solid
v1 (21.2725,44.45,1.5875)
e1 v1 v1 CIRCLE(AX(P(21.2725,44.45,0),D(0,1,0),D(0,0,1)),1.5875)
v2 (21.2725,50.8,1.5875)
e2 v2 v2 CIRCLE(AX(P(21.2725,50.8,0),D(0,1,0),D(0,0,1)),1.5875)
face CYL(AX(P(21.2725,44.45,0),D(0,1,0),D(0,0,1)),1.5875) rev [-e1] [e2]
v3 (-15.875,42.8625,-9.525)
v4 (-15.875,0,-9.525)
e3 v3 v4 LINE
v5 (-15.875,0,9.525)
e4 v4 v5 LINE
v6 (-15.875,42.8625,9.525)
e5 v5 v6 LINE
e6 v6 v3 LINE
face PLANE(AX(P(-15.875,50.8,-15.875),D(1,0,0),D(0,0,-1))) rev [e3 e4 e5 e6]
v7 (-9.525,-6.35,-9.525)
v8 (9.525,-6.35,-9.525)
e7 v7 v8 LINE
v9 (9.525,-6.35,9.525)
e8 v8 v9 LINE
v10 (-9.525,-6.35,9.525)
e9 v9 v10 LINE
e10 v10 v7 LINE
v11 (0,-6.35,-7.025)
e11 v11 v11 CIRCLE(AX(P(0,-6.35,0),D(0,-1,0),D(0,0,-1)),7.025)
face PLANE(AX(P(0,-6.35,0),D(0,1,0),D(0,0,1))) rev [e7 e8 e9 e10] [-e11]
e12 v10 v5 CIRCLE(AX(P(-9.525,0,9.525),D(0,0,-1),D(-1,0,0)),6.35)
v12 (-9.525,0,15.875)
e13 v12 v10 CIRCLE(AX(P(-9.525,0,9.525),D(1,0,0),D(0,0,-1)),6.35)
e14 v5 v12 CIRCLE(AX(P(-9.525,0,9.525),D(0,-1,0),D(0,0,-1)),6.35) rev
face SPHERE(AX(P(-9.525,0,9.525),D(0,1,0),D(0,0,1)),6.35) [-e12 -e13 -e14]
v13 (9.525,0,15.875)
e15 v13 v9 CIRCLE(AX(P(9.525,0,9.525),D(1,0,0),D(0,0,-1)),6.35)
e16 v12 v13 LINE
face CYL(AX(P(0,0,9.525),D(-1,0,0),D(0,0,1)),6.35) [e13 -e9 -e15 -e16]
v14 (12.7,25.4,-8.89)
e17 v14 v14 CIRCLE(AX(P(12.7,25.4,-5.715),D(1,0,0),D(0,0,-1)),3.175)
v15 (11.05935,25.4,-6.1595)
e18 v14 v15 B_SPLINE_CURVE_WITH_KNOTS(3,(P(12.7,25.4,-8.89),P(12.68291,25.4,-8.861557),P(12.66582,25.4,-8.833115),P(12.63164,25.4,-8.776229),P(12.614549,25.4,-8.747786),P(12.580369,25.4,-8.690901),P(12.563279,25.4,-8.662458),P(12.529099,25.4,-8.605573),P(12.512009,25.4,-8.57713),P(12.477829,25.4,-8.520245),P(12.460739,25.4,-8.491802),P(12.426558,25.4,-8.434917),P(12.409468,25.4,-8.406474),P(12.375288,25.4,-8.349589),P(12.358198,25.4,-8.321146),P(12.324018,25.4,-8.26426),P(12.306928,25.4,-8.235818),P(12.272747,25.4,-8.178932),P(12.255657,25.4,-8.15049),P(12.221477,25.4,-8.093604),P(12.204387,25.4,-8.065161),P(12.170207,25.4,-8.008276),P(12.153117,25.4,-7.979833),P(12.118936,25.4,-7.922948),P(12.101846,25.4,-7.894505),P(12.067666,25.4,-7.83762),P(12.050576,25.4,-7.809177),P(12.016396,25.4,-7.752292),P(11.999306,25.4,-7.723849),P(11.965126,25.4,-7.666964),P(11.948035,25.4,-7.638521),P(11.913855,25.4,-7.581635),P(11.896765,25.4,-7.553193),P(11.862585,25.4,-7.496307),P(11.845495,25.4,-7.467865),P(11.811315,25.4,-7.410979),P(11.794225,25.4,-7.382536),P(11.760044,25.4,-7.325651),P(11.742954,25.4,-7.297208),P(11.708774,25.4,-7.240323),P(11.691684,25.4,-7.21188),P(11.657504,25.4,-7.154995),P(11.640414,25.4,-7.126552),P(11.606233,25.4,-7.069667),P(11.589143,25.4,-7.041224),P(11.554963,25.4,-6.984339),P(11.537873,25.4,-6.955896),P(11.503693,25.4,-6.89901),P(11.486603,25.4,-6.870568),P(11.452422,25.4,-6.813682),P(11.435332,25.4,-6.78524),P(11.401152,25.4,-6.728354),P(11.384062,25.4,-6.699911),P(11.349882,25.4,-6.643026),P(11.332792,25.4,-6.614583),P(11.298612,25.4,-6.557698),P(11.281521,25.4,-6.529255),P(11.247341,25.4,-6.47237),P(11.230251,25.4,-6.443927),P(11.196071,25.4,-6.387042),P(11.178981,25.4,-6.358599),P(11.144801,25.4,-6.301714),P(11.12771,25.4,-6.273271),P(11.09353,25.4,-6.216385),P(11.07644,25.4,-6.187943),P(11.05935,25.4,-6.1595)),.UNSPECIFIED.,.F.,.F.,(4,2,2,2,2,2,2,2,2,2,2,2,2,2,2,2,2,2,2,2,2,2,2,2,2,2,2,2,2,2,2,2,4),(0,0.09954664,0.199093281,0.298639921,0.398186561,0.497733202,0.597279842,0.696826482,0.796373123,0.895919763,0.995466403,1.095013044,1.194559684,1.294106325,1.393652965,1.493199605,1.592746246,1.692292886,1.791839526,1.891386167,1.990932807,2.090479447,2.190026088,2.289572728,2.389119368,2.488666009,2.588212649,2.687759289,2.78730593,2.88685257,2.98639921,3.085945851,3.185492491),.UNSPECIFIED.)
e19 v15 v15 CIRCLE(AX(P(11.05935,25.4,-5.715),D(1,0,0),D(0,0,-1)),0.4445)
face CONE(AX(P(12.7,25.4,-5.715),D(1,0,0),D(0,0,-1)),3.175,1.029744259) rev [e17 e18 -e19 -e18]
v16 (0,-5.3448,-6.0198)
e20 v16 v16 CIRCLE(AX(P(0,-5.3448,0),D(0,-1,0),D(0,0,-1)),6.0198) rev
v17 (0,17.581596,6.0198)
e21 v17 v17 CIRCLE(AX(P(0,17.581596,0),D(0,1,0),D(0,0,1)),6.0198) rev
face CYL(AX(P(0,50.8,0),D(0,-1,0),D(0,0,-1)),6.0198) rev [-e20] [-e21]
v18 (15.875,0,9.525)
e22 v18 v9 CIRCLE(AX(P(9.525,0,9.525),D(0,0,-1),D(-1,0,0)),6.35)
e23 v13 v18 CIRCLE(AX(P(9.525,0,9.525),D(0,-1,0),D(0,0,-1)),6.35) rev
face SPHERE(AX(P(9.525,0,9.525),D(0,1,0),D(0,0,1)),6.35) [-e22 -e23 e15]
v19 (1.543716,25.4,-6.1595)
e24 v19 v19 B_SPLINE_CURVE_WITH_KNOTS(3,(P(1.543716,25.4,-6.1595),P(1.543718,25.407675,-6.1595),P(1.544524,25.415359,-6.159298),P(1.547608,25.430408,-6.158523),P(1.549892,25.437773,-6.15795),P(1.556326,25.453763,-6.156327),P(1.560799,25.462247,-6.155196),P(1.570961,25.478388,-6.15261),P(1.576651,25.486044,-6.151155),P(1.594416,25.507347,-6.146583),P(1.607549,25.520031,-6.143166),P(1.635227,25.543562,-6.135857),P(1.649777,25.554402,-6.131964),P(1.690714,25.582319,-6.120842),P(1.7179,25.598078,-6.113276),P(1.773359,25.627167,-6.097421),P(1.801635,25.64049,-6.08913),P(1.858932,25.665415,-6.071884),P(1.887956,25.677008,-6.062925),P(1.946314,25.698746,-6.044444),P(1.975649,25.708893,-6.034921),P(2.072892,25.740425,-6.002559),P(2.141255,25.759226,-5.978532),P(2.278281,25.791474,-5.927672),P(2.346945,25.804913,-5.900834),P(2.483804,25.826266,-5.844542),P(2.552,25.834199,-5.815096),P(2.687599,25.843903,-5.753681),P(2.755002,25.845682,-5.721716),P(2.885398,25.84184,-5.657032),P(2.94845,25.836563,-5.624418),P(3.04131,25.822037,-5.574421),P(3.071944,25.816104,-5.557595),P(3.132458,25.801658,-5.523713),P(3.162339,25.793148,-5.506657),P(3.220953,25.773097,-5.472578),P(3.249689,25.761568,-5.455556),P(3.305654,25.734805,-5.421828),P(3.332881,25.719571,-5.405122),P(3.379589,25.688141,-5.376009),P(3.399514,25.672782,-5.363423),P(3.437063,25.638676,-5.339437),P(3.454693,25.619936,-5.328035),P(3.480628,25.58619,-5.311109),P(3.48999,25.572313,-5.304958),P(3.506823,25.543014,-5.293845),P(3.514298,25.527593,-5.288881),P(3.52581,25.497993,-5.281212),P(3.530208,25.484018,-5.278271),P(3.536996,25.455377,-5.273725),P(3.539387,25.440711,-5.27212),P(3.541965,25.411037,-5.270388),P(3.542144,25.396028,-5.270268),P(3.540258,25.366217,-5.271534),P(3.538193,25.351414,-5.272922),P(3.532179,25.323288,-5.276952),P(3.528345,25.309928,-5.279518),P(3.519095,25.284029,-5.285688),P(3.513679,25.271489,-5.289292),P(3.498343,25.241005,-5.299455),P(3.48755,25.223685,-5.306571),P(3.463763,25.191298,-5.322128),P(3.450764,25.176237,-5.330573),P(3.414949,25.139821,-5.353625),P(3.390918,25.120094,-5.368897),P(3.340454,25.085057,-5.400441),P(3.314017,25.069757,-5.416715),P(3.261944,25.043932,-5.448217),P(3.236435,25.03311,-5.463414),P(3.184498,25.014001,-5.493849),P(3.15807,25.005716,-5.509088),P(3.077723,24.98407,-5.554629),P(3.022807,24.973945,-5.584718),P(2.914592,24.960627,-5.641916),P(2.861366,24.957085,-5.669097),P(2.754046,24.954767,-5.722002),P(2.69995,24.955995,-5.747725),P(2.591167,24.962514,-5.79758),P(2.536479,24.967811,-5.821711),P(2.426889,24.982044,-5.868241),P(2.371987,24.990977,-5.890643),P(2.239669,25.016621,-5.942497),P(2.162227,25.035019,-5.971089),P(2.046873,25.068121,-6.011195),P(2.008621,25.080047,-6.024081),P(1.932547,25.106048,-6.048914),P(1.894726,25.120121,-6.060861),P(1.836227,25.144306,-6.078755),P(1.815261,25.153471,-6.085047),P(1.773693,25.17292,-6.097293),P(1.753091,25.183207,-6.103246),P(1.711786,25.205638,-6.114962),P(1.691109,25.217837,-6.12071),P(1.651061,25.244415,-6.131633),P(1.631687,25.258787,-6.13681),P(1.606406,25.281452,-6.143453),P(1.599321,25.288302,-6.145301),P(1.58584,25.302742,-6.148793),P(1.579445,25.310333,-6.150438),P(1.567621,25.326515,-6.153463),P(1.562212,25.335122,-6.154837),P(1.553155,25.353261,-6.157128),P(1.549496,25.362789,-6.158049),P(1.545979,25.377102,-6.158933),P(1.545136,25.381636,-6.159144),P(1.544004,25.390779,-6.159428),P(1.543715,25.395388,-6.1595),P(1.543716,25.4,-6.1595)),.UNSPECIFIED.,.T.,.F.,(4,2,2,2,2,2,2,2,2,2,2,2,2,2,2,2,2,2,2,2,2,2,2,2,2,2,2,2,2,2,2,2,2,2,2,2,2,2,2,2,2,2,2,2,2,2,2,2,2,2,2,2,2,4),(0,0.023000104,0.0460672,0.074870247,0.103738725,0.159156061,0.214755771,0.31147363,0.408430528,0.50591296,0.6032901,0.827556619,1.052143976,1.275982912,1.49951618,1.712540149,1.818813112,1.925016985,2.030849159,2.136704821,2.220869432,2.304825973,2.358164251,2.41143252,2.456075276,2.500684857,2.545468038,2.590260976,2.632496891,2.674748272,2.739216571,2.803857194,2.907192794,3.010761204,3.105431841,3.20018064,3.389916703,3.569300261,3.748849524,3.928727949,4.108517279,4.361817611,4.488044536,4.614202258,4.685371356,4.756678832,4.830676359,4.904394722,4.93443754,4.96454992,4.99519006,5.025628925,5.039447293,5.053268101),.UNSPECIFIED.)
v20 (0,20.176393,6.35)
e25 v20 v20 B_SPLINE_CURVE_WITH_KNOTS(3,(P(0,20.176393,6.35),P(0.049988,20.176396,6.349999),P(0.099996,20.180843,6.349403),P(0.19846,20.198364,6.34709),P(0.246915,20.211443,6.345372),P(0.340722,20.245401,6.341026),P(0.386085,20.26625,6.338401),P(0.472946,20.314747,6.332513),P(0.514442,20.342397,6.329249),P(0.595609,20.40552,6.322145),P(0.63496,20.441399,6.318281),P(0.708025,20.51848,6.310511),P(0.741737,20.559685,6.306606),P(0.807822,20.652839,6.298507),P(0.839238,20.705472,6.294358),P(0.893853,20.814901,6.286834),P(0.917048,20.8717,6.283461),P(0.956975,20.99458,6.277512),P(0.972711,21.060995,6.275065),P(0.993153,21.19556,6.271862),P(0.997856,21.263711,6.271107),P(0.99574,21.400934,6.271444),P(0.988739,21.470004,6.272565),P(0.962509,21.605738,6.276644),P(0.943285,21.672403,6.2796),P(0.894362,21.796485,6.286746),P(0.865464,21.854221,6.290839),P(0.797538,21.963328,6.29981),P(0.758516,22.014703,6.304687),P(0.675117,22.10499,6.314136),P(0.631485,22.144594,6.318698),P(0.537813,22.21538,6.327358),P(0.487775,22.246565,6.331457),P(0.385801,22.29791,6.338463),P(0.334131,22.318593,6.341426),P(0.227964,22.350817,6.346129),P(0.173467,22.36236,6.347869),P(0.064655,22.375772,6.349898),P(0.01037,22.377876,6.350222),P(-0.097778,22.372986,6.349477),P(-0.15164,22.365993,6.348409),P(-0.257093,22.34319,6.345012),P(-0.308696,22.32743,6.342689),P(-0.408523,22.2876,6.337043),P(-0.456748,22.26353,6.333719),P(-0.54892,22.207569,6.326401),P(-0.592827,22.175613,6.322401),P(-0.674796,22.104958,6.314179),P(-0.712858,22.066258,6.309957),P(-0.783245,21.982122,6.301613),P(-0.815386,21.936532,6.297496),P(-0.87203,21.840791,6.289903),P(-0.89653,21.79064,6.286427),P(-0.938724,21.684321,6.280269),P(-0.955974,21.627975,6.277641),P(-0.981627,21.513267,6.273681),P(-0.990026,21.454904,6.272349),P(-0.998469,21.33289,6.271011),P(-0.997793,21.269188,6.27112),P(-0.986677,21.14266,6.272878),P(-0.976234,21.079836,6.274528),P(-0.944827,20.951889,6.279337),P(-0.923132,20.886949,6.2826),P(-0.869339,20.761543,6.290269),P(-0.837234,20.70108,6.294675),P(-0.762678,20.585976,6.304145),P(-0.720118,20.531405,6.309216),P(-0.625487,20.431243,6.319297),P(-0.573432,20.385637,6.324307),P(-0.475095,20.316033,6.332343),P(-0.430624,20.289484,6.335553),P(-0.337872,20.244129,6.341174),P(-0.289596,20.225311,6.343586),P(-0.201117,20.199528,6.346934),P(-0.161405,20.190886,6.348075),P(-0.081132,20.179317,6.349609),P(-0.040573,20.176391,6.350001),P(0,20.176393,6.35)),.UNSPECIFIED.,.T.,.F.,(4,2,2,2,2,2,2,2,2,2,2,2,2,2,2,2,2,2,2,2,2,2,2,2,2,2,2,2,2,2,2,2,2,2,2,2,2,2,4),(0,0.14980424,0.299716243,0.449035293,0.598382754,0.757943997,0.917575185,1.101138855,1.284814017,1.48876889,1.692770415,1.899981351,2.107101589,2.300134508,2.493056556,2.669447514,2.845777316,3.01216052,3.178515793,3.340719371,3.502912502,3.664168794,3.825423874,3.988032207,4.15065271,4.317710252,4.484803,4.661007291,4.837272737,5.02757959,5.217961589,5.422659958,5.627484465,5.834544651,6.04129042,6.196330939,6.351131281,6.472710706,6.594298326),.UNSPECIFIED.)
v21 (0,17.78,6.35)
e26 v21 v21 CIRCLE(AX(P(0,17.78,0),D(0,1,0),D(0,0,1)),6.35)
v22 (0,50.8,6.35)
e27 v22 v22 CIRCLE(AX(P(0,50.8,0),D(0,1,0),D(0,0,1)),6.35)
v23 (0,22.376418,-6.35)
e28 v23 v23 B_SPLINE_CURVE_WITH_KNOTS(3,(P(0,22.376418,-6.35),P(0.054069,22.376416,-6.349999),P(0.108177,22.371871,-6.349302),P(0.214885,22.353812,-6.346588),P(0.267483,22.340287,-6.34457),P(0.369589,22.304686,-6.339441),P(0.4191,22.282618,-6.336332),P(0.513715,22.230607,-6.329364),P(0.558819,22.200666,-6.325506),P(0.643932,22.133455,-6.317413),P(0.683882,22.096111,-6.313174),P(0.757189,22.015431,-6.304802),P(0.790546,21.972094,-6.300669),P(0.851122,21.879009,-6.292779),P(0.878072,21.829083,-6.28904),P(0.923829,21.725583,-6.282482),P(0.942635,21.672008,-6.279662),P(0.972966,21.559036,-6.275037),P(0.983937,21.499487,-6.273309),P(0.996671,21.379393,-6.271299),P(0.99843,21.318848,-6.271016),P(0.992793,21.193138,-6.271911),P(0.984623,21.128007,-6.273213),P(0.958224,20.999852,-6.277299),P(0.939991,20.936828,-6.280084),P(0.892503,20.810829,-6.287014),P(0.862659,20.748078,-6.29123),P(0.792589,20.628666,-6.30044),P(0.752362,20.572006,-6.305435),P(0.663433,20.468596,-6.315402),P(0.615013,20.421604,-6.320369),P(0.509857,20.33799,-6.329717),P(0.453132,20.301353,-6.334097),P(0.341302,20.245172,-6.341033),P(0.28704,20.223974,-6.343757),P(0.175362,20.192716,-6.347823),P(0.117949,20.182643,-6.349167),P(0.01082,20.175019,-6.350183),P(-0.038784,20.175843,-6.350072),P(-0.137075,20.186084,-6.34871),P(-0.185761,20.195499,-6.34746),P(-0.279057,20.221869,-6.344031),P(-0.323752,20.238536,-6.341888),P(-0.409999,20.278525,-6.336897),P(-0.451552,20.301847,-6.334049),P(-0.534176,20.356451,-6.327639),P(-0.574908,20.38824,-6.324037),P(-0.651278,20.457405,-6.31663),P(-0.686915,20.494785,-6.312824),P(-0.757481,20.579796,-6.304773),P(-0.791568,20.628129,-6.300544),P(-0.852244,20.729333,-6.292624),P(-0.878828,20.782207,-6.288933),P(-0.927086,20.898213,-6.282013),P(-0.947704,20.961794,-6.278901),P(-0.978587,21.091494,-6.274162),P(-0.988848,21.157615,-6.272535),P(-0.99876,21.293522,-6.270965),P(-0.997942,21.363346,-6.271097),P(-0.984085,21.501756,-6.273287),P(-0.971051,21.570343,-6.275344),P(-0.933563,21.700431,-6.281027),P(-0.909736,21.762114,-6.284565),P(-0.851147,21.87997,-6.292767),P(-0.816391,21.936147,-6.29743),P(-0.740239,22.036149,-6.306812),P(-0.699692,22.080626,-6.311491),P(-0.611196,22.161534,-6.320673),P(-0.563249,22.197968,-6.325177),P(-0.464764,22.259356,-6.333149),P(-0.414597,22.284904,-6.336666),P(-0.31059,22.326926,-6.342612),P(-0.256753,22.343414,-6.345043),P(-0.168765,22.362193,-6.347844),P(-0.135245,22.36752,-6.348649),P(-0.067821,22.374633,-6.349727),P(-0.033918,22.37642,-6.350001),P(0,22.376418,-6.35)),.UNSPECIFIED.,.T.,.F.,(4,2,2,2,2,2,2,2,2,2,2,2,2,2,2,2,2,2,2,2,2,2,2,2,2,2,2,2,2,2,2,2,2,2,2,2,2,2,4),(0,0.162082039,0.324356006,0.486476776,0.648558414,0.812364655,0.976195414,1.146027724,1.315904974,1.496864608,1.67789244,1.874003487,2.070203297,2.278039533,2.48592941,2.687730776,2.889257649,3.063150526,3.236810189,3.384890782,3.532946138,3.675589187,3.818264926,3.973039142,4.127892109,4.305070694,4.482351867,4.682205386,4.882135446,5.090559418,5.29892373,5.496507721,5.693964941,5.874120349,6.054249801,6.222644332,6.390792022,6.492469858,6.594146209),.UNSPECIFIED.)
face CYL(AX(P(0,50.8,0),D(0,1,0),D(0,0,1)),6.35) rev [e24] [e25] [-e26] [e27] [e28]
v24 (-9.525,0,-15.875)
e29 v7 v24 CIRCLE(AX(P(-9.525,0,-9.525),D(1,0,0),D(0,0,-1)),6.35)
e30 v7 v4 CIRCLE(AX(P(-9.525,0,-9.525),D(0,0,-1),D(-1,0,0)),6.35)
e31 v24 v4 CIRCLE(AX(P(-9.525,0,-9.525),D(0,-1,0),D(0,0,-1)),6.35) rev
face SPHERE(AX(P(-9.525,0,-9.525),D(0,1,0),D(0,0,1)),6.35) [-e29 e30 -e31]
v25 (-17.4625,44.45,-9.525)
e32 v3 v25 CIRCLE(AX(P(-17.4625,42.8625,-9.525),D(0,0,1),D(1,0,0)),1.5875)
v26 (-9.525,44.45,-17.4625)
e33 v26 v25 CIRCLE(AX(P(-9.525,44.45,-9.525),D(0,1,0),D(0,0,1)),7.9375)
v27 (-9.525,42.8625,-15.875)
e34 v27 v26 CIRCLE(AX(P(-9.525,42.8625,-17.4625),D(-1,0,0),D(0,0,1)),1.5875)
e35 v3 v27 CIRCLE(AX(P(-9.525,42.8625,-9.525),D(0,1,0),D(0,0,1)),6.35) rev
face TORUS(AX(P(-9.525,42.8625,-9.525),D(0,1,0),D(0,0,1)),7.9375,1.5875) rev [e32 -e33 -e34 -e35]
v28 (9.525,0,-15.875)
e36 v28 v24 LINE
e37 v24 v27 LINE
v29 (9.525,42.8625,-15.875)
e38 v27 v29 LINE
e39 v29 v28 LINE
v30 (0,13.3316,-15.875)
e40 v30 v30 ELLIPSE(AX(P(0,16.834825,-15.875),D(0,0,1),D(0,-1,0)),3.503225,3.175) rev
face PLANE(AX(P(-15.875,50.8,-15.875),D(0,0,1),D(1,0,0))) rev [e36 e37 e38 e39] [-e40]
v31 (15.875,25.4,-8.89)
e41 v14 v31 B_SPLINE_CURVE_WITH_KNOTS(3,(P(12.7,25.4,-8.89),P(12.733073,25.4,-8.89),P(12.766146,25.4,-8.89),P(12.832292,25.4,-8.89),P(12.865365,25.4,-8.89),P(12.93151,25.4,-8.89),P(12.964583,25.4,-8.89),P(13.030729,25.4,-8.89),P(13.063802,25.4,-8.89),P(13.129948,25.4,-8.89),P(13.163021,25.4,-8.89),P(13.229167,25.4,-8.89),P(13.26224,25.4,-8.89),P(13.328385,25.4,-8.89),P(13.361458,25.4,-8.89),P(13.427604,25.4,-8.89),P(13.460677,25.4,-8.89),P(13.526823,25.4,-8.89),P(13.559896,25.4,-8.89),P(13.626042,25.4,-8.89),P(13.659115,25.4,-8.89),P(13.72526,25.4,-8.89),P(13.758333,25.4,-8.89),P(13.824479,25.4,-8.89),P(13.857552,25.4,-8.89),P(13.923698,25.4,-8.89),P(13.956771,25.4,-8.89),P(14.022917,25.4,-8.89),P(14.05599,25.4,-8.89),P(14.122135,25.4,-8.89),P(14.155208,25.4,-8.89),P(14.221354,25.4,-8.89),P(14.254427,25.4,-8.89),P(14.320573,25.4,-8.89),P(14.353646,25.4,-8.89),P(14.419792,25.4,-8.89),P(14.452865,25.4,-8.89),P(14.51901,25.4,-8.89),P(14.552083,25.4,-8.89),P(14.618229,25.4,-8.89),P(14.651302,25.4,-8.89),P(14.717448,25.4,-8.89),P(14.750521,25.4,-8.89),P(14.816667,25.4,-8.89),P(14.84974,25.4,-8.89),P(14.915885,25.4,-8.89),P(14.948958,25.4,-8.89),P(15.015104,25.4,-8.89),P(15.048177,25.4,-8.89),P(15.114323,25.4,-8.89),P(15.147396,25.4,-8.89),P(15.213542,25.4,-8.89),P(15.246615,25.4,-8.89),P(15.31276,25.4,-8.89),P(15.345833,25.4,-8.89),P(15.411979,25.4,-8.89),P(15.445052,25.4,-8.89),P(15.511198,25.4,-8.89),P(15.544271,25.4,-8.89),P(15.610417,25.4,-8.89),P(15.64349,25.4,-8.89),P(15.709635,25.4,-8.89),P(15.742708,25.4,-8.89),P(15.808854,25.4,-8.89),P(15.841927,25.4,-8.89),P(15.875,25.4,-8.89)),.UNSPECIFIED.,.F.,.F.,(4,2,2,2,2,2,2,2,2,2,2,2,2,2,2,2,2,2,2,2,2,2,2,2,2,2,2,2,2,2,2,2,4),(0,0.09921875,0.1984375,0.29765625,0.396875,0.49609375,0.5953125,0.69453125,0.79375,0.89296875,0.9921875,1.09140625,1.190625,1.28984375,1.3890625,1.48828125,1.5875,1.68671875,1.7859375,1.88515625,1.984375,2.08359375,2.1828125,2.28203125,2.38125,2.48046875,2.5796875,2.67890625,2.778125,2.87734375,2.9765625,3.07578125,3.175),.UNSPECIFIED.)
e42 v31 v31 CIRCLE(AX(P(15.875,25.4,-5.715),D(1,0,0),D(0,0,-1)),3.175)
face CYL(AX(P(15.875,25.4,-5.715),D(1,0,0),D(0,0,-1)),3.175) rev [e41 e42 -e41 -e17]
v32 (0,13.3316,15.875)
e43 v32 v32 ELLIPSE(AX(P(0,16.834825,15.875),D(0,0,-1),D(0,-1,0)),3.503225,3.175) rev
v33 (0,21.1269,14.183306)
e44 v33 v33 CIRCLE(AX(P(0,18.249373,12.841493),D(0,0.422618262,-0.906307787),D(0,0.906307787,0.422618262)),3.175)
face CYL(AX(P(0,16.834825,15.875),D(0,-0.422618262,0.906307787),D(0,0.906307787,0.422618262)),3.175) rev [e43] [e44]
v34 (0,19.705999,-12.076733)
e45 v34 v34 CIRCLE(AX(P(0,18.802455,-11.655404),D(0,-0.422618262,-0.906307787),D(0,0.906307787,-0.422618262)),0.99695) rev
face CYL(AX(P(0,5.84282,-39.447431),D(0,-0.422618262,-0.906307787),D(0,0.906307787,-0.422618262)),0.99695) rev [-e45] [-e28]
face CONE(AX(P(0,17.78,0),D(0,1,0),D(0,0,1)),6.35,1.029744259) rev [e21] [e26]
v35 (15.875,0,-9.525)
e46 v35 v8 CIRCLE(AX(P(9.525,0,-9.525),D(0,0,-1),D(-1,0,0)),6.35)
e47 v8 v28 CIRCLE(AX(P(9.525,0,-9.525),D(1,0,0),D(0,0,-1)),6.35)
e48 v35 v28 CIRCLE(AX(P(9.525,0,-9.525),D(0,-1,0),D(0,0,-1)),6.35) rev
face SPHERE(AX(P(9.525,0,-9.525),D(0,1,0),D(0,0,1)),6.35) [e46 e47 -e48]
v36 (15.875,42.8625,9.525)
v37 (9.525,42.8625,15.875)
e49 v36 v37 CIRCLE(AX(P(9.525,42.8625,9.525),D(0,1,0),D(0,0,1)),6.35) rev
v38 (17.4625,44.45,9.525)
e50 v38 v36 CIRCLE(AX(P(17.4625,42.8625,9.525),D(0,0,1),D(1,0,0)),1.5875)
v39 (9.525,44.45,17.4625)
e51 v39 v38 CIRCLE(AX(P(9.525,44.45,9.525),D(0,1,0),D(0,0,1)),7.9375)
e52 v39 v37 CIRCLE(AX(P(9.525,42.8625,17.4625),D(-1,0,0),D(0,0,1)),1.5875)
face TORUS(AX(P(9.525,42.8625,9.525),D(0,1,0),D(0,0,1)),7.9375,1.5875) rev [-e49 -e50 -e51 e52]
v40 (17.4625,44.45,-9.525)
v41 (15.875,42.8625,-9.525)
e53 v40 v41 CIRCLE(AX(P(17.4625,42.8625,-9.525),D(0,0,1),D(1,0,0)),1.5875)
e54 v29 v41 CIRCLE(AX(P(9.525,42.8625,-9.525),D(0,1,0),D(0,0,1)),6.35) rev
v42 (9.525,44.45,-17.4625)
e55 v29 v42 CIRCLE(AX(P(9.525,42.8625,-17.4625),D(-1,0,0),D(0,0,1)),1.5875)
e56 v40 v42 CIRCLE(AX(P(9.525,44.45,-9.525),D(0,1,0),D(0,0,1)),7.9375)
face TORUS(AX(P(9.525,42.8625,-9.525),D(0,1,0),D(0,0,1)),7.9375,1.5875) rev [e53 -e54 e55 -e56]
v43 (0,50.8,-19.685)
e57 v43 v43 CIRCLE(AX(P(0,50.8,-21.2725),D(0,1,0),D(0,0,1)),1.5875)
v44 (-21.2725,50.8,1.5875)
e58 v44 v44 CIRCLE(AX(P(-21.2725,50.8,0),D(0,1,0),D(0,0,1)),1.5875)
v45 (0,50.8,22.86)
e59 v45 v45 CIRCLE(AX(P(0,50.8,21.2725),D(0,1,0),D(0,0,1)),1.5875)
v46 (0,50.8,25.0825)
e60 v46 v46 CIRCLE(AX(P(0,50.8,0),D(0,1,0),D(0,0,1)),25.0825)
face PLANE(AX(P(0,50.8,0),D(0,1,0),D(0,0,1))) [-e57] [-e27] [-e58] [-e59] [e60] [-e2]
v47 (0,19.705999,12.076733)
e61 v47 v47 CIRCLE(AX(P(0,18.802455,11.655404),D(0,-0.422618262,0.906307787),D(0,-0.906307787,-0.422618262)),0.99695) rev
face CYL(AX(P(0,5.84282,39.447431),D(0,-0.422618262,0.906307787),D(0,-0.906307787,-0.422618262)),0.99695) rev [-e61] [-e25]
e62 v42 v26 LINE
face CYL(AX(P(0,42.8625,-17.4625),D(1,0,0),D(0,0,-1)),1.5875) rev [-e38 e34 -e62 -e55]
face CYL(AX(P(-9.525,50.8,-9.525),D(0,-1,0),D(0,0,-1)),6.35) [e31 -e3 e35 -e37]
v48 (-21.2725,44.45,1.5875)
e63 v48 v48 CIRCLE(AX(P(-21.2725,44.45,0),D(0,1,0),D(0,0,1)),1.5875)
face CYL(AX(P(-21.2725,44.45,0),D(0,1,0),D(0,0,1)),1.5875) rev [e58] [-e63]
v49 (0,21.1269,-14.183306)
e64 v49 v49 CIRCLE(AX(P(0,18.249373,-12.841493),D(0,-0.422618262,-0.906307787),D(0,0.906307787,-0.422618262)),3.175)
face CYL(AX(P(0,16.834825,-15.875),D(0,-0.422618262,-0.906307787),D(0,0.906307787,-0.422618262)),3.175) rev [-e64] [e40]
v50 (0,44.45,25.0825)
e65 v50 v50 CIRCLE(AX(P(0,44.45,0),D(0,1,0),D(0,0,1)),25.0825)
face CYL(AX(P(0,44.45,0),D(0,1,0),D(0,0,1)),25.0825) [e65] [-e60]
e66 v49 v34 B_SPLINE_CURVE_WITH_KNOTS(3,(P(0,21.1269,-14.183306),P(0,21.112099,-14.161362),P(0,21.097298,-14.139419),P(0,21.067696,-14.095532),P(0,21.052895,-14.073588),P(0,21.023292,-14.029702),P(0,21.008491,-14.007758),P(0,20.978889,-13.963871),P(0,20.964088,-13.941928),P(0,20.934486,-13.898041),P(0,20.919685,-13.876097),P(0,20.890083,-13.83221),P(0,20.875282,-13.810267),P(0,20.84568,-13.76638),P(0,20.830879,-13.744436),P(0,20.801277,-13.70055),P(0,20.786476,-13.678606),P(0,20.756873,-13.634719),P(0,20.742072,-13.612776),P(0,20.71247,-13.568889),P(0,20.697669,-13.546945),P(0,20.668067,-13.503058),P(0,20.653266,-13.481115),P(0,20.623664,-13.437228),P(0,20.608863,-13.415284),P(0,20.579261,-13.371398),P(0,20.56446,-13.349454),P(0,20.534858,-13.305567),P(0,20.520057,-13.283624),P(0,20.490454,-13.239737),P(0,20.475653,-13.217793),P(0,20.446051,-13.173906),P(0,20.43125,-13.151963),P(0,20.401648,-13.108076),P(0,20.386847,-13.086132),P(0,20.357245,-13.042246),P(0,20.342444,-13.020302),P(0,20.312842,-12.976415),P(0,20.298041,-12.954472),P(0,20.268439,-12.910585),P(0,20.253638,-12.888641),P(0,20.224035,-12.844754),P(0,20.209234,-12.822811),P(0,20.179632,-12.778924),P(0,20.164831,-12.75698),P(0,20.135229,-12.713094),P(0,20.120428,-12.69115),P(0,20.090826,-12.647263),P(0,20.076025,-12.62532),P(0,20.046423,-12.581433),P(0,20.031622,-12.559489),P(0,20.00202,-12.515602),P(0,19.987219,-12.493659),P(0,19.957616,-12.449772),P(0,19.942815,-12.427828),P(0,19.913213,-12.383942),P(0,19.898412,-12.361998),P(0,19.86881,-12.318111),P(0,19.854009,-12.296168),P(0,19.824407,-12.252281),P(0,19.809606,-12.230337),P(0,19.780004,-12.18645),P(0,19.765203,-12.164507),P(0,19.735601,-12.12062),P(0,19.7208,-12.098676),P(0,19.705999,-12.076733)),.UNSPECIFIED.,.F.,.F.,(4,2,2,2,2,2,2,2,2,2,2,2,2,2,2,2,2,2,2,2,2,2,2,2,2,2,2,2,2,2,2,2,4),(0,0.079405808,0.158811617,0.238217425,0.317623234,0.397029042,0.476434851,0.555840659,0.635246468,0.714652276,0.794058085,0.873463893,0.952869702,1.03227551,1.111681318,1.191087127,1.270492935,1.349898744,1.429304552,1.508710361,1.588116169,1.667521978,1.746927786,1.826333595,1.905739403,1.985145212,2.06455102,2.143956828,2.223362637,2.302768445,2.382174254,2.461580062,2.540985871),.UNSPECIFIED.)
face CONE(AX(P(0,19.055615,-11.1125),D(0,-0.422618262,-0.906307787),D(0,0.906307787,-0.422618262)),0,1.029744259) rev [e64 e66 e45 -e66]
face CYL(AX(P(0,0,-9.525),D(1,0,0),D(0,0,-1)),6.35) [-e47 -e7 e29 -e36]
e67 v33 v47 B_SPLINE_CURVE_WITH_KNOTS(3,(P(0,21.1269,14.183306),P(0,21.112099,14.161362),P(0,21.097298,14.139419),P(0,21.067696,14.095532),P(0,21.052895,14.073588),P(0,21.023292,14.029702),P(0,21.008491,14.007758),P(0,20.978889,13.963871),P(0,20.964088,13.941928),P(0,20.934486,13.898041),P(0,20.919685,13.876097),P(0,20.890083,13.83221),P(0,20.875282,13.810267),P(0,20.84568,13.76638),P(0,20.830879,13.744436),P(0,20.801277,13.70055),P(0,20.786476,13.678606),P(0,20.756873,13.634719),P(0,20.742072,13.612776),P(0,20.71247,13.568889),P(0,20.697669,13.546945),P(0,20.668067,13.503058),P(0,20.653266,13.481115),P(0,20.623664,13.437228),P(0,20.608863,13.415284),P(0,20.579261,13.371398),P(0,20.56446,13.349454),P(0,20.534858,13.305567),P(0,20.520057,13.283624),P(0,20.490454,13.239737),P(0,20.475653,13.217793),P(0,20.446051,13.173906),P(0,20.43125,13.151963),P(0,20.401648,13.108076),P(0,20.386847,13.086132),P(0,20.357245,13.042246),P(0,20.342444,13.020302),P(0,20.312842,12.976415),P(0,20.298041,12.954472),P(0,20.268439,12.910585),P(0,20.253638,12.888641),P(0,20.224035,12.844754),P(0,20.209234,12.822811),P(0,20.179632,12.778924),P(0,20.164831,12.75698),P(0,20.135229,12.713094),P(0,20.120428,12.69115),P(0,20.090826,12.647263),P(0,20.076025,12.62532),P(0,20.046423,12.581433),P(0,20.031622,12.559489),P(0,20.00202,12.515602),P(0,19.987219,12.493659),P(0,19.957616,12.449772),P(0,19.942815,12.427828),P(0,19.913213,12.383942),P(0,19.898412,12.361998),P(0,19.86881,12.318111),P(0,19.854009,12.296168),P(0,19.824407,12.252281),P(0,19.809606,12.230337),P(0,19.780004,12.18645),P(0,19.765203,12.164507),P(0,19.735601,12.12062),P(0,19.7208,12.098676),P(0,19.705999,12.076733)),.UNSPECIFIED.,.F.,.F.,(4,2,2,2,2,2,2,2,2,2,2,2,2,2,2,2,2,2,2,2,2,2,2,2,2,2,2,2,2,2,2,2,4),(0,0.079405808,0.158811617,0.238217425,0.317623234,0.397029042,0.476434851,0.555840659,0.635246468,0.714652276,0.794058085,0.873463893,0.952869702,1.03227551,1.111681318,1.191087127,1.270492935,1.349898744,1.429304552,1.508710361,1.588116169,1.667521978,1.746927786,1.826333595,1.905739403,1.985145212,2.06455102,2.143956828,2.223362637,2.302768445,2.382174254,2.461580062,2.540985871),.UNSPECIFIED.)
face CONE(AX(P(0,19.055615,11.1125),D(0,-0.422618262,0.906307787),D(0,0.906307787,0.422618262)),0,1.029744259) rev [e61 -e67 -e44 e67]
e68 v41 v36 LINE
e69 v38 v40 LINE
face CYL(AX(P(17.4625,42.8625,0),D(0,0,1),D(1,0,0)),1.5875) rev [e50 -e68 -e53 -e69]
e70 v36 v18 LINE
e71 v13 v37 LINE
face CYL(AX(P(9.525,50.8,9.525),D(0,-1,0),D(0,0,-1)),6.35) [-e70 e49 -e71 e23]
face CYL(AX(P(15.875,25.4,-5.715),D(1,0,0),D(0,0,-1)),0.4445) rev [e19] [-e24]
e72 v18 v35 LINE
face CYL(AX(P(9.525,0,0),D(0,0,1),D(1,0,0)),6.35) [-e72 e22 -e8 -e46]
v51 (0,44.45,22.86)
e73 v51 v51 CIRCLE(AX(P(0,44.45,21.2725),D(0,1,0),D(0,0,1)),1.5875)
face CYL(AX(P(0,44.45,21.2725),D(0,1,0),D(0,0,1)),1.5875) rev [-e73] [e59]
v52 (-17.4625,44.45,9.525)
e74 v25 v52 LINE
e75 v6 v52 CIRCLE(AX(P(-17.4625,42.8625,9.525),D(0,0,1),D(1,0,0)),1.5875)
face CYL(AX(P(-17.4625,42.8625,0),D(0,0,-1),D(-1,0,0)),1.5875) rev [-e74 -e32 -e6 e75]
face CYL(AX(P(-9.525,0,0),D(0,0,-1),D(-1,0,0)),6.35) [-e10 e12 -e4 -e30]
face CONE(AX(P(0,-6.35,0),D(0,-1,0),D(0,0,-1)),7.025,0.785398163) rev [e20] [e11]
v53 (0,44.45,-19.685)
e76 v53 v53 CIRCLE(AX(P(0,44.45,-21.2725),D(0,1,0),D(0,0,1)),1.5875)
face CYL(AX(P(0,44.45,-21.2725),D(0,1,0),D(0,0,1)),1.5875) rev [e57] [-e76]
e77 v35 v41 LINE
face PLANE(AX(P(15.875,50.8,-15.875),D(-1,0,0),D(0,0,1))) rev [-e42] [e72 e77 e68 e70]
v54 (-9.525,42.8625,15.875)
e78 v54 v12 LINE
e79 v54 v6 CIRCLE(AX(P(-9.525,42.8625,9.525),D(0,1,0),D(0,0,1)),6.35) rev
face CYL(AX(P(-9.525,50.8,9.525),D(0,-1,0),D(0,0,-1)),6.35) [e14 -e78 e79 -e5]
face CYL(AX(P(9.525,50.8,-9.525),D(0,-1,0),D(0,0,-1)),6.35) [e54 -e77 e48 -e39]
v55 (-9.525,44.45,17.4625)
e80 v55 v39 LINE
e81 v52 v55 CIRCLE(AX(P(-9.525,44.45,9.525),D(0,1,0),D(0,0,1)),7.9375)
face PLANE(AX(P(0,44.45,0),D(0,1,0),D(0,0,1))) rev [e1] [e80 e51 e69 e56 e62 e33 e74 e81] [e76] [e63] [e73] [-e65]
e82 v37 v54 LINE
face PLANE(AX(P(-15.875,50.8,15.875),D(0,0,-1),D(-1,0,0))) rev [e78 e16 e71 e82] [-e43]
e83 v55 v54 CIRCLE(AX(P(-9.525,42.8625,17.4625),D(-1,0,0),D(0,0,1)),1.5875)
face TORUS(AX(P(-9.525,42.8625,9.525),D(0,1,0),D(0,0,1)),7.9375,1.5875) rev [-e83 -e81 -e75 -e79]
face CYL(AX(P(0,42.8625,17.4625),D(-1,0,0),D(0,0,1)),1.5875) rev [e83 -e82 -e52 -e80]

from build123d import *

# Parameters (mm, degrees)
SKETCH1_W                        = 31.75
SKETCH1_H                        = 31.75
STOCK_DEPTH                      = 50.8
SP_TAP_D                         = 12.7
SP_TAP_DEPTH                     = 33.02
SP_TAP_TIP                       = 3.815464931
F_47_START                       = -7.737817178
F_47_0_0785_GOX_ORFICE_OUTLINE_R = 0.99695
F_47_0_0785_GOX_ORFICE_DEPTH     = 11.439445718
F_65_0_035_DIAMETER_HOLE2_REACH  = 63.974
F_65_0_035_DIAMETER_HOLE2_BORE_R = 0.4445
SKETCH25_W                       = 31.75
SKETCH25_H                       = 31.75
BOSS_EXTRUDE1_DEPTH              = 6.35
M14_TAPPED_HOLE1_D               = 12
M14_TAPPED_HOLE1_DEPTH           = 19.05
M14_TAPPED_HOLE1_CSINK_D         = 14.05
M14_TAPPED_HOLE1_CSINK_ANGLE     = 90
M14_TAPPED_HOLE1_TIP             = 3.605163714
SKETCH30_R                       = 6.0198
CUT_EXTRUDE1_DEPTH               = 62.401577893
SKETCH31_R                       = 25.0825
SKETCH31_R_2                     = 1.5875
SKETCH31_W                       = 31.75
SKETCH31_H                       = 31.75
BOSS_EXTRUDE2_DEPTH              = 6.35
F_1_4_0_25_DIAMETER_HOLE1_D      = 6.35
F_1_4_0_25_DIAMETER_HOLE1_DEPTH  = 3.175
F_1_4_0_25_DIAMETER_HOLE1_TIP    = 1.907732465
FILLET2_R                        = 6.35
FILLET3_R                        = 6.35
FILLET4_R                        = 1.5875


# Read off the part's stored shape, not the designer's step: #47 (0.0785) GOx Orfice
with BuildPart() as part:
    # Sketch1 → Stock (new body)
    with BuildSketch(Plane(origin=(0, 0, 0), x_dir=(1, 0, 0), z_dir=(0, 1, 0))):
        Rectangle(SKETCH1_W, SKETCH1_H)
    extrude(amount=STOCK_DEPTH)

    # SP TAP
    with Locations(Plane(origin=(0, 50.8, 0), x_dir=(1, 0, 0), z_dir=(0, 1, 0))):
        with Locations((0, 0)):
            Hole(SP_TAP_D / 2, depth=SP_TAP_DEPTH)
            with Locations((0, 0, -(SP_TAP_DEPTH + SP_TAP_TIP / 2))):  # 118° drill point
                Cone(0, SP_TAP_D / 2, SP_TAP_TIP, mode=Mode.SUBTRACT)

    # #47 (0.0785) GOx Orfice outline → #47 (0.0785) GOx Orfice (cut)
    with BuildSketch(Plane(origin=(0, 0, 0), x_dir=(1, 0, 0), z_dir=(0, 0.42261826174069705, 0.9063077870366512)).offset(F_47_START)):
        with Locations((0, 21.96659786)):
            Circle(F_47_0_0785_GOX_ORFICE_OUTLINE_R)
    f_47_0_0785_gox_orfice = extrude(amount=F_47_0_0785_GOX_ORFICE_DEPTH, mode=Mode.SUBTRACT)

    # Second GOx Orfice: #47 (0.0785) GOx Orfice across plane
    add(f_47_0_0785_gox_orfice.mirror(Plane.XY), mode=Mode.SUBTRACT)

    # #65 (0.035) Diameter Hole2 bore → #65 (0.035) Diameter Hole2 (cut, up to next)
    with BuildSketch(Plane(origin=(15.875, 0, 0), x_dir=(0, 0, -1), z_dir=(1, 0, 0)), mode=Mode.PRIVATE) as f_65_0_035_diameter_hole2_sk1:
        with Locations((5.715, 25.4)):
            Circle(F_65_0_035_DIAMETER_HOLE2_BORE_R)
    f_65_0_035_diameter_hole2_tool1 = extrude(f_65_0_035_diameter_hole2_sk1.sketch, amount=-F_65_0_035_DIAMETER_HOLE2_REACH, mode=Mode.PRIVATE) & part.part
    add(f_65_0_035_diameter_hole2_tool1.solids().sort_by_distance((15.875, 25.4, -5.715))[0], mode=Mode.SUBTRACT)

    # Sketch25 → Boss-Extrude1 (add)
    with BuildSketch(Plane(origin=(0, 0, 0), x_dir=(-1, 0, 0), z_dir=(0, -1, 0))):
        Rectangle(SKETCH25_W, SKETCH25_H)
    extrude(amount=BOSS_EXTRUDE1_DEPTH)

    # M14 Tapped Hole1
    with Locations(Plane(origin=(0, -6.35, 0), x_dir=(-1, 0, 0), z_dir=(0, -1, 0))):
        with Locations((0, 0)):
            CounterSinkHole(M14_TAPPED_HOLE1_D / 2, M14_TAPPED_HOLE1_CSINK_D / 2, depth=M14_TAPPED_HOLE1_DEPTH, counter_sink_angle=M14_TAPPED_HOLE1_CSINK_ANGLE)
            with Locations((0, 0, -(M14_TAPPED_HOLE1_DEPTH + M14_TAPPED_HOLE1_TIP / 2))):  # 118° drill point
                Cone(0, M14_TAPPED_HOLE1_D / 2, M14_TAPPED_HOLE1_TIP, mode=Mode.SUBTRACT)

    # Sketch30 → Cut-Extrude1 (cut, through all)
    with BuildSketch(Plane(origin=(0, -6.35, 0), x_dir=(-1, 0, 0), z_dir=(0, -1, 0))):
        with Locations(Location((0, 0, 0), (0, 0, 90))):
            Circle(SKETCH30_R)
    extrude(amount=-CUT_EXTRUDE1_DEPTH, mode=Mode.SUBTRACT)

    # Sketch31 → Boss-Extrude2 (add)
    with BuildSketch(Plane(origin=(0, 50.8, 0), x_dir=(1, 0, 0), z_dir=(0, 1, 0))):
        with Locations(Location((0, 0, 0), (0, 0, 270))):
            Circle(SKETCH31_R)
        with Locations(Location((21.2725, 0, 0), (0, 0, 270))):
            Circle(SKETCH31_R_2, mode=Mode.SUBTRACT)
        with Locations(Location((0, -21.2725, 0), (0, 0, 270))):
            Circle(SKETCH31_R_2, mode=Mode.SUBTRACT)
        with Locations(Location((-21.2725, 0, 0), (0, 0, 270))):
            Circle(SKETCH31_R_2, mode=Mode.SUBTRACT)
        with Locations(Location((0, 21.2725, 0), (0, 0, 270))):
            Circle(SKETCH31_R_2, mode=Mode.SUBTRACT)
        Rectangle(SKETCH31_W, SKETCH31_H, mode=Mode.SUBTRACT)
    extrude(amount=-BOSS_EXTRUDE2_DEPTH)

    # 1/4 (0.25) Diameter Hole1
    with Locations(Plane(origin=(15.875, 0, 0), x_dir=(0, 0, -1), z_dir=(1, 0, 0))):
        with Locations((5.715, 25.4)):
            Hole(F_1_4_0_25_DIAMETER_HOLE1_D / 2, depth=F_1_4_0_25_DIAMETER_HOLE1_DEPTH)
            with Locations((0, 0, -(F_1_4_0_25_DIAMETER_HOLE1_DEPTH + F_1_4_0_25_DIAMETER_HOLE1_TIP / 2))):  # 118° drill point
                Cone(0, F_1_4_0_25_DIAMETER_HOLE1_D / 2, F_1_4_0_25_DIAMETER_HOLE1_TIP, mode=Mode.SUBTRACT)

    # Sketch35 → Cut-Revolve1 (revolve, cut)
    with BuildSketch(Plane(origin=(0, 0, 0), x_dir=(0, 0, -1), z_dir=(1, 0, 0)), mode=Mode.PRIVATE) as cut_revolve1_sk:
        Polygon((11.1125, 19.055615182), (11.499679808, 15.37184538), (19.76016519, 11.519917786), (21.101978171, 14.39744501), (15.875, 16.83482496), align=None)
    cut_revolve1 = revolve(cut_revolve1_sk.sketch.rotate(Axis((0, 16.83482496, -15.875), (0, 0.4226182617406968, 0.9063077870366512)), 180), axis=Axis((0, 16.83482496, -15.875), (0, 0.4226182617406968, 0.9063077870366512)), mode=Mode.SUBTRACT)

    # Mirror1: Cut-Revolve1 across plane
    add(cut_revolve1.mirror(Plane.XY), mode=Mode.SUBTRACT)

    # Fillet2
    fillet2_edges = [part.edges().sort_by_distance(p)[0] for p in [
        (-15.875, 19.05, 15.875),
        (15.875, 19.05, 15.875),
        (-15.875, 19.05, -15.875),
        (15.875, 19.05, -15.875),
    ]]
    fillet(fillet2_edges, radius=FILLET2_R)

    # Fillet3
    fillet3_edges = [part.edges().sort_by_distance(p)[0] for p in [
        (0, -6.35, 15.875),
        (15.875, -6.35, 0),
        (-15.875, -6.35, 0),
        (0, -6.35, -15.875),
        (-14.015128061, -6.35, -14.015128061),
        (14.015128061, -6.35, -14.015128061),
        (14.015128061, -6.35, 14.015128061),
        (-14.015128061, -6.35, 14.015128061),
    ]]
    fillet(fillet3_edges, radius=FILLET3_R)

    # Fillet4
    fillet4_edges = [part.edges().sort_by_distance(p)[0] for p in [
        (0, 44.45, 15.875),
        (-15.875, 44.45, 0),
        (15.875, 44.45, 0),
        (0, 44.45, -15.875),
        (-14.015128061, 44.45, 14.015128061),
        (14.015128061, 44.45, 14.015128061),
        (14.015128061, 44.45, -14.015128061),
        (-14.015128061, 44.45, -14.015128061),
    ]]
    fillet(fillet4_edges, radius=FILLET4_R)


solid = part.part
